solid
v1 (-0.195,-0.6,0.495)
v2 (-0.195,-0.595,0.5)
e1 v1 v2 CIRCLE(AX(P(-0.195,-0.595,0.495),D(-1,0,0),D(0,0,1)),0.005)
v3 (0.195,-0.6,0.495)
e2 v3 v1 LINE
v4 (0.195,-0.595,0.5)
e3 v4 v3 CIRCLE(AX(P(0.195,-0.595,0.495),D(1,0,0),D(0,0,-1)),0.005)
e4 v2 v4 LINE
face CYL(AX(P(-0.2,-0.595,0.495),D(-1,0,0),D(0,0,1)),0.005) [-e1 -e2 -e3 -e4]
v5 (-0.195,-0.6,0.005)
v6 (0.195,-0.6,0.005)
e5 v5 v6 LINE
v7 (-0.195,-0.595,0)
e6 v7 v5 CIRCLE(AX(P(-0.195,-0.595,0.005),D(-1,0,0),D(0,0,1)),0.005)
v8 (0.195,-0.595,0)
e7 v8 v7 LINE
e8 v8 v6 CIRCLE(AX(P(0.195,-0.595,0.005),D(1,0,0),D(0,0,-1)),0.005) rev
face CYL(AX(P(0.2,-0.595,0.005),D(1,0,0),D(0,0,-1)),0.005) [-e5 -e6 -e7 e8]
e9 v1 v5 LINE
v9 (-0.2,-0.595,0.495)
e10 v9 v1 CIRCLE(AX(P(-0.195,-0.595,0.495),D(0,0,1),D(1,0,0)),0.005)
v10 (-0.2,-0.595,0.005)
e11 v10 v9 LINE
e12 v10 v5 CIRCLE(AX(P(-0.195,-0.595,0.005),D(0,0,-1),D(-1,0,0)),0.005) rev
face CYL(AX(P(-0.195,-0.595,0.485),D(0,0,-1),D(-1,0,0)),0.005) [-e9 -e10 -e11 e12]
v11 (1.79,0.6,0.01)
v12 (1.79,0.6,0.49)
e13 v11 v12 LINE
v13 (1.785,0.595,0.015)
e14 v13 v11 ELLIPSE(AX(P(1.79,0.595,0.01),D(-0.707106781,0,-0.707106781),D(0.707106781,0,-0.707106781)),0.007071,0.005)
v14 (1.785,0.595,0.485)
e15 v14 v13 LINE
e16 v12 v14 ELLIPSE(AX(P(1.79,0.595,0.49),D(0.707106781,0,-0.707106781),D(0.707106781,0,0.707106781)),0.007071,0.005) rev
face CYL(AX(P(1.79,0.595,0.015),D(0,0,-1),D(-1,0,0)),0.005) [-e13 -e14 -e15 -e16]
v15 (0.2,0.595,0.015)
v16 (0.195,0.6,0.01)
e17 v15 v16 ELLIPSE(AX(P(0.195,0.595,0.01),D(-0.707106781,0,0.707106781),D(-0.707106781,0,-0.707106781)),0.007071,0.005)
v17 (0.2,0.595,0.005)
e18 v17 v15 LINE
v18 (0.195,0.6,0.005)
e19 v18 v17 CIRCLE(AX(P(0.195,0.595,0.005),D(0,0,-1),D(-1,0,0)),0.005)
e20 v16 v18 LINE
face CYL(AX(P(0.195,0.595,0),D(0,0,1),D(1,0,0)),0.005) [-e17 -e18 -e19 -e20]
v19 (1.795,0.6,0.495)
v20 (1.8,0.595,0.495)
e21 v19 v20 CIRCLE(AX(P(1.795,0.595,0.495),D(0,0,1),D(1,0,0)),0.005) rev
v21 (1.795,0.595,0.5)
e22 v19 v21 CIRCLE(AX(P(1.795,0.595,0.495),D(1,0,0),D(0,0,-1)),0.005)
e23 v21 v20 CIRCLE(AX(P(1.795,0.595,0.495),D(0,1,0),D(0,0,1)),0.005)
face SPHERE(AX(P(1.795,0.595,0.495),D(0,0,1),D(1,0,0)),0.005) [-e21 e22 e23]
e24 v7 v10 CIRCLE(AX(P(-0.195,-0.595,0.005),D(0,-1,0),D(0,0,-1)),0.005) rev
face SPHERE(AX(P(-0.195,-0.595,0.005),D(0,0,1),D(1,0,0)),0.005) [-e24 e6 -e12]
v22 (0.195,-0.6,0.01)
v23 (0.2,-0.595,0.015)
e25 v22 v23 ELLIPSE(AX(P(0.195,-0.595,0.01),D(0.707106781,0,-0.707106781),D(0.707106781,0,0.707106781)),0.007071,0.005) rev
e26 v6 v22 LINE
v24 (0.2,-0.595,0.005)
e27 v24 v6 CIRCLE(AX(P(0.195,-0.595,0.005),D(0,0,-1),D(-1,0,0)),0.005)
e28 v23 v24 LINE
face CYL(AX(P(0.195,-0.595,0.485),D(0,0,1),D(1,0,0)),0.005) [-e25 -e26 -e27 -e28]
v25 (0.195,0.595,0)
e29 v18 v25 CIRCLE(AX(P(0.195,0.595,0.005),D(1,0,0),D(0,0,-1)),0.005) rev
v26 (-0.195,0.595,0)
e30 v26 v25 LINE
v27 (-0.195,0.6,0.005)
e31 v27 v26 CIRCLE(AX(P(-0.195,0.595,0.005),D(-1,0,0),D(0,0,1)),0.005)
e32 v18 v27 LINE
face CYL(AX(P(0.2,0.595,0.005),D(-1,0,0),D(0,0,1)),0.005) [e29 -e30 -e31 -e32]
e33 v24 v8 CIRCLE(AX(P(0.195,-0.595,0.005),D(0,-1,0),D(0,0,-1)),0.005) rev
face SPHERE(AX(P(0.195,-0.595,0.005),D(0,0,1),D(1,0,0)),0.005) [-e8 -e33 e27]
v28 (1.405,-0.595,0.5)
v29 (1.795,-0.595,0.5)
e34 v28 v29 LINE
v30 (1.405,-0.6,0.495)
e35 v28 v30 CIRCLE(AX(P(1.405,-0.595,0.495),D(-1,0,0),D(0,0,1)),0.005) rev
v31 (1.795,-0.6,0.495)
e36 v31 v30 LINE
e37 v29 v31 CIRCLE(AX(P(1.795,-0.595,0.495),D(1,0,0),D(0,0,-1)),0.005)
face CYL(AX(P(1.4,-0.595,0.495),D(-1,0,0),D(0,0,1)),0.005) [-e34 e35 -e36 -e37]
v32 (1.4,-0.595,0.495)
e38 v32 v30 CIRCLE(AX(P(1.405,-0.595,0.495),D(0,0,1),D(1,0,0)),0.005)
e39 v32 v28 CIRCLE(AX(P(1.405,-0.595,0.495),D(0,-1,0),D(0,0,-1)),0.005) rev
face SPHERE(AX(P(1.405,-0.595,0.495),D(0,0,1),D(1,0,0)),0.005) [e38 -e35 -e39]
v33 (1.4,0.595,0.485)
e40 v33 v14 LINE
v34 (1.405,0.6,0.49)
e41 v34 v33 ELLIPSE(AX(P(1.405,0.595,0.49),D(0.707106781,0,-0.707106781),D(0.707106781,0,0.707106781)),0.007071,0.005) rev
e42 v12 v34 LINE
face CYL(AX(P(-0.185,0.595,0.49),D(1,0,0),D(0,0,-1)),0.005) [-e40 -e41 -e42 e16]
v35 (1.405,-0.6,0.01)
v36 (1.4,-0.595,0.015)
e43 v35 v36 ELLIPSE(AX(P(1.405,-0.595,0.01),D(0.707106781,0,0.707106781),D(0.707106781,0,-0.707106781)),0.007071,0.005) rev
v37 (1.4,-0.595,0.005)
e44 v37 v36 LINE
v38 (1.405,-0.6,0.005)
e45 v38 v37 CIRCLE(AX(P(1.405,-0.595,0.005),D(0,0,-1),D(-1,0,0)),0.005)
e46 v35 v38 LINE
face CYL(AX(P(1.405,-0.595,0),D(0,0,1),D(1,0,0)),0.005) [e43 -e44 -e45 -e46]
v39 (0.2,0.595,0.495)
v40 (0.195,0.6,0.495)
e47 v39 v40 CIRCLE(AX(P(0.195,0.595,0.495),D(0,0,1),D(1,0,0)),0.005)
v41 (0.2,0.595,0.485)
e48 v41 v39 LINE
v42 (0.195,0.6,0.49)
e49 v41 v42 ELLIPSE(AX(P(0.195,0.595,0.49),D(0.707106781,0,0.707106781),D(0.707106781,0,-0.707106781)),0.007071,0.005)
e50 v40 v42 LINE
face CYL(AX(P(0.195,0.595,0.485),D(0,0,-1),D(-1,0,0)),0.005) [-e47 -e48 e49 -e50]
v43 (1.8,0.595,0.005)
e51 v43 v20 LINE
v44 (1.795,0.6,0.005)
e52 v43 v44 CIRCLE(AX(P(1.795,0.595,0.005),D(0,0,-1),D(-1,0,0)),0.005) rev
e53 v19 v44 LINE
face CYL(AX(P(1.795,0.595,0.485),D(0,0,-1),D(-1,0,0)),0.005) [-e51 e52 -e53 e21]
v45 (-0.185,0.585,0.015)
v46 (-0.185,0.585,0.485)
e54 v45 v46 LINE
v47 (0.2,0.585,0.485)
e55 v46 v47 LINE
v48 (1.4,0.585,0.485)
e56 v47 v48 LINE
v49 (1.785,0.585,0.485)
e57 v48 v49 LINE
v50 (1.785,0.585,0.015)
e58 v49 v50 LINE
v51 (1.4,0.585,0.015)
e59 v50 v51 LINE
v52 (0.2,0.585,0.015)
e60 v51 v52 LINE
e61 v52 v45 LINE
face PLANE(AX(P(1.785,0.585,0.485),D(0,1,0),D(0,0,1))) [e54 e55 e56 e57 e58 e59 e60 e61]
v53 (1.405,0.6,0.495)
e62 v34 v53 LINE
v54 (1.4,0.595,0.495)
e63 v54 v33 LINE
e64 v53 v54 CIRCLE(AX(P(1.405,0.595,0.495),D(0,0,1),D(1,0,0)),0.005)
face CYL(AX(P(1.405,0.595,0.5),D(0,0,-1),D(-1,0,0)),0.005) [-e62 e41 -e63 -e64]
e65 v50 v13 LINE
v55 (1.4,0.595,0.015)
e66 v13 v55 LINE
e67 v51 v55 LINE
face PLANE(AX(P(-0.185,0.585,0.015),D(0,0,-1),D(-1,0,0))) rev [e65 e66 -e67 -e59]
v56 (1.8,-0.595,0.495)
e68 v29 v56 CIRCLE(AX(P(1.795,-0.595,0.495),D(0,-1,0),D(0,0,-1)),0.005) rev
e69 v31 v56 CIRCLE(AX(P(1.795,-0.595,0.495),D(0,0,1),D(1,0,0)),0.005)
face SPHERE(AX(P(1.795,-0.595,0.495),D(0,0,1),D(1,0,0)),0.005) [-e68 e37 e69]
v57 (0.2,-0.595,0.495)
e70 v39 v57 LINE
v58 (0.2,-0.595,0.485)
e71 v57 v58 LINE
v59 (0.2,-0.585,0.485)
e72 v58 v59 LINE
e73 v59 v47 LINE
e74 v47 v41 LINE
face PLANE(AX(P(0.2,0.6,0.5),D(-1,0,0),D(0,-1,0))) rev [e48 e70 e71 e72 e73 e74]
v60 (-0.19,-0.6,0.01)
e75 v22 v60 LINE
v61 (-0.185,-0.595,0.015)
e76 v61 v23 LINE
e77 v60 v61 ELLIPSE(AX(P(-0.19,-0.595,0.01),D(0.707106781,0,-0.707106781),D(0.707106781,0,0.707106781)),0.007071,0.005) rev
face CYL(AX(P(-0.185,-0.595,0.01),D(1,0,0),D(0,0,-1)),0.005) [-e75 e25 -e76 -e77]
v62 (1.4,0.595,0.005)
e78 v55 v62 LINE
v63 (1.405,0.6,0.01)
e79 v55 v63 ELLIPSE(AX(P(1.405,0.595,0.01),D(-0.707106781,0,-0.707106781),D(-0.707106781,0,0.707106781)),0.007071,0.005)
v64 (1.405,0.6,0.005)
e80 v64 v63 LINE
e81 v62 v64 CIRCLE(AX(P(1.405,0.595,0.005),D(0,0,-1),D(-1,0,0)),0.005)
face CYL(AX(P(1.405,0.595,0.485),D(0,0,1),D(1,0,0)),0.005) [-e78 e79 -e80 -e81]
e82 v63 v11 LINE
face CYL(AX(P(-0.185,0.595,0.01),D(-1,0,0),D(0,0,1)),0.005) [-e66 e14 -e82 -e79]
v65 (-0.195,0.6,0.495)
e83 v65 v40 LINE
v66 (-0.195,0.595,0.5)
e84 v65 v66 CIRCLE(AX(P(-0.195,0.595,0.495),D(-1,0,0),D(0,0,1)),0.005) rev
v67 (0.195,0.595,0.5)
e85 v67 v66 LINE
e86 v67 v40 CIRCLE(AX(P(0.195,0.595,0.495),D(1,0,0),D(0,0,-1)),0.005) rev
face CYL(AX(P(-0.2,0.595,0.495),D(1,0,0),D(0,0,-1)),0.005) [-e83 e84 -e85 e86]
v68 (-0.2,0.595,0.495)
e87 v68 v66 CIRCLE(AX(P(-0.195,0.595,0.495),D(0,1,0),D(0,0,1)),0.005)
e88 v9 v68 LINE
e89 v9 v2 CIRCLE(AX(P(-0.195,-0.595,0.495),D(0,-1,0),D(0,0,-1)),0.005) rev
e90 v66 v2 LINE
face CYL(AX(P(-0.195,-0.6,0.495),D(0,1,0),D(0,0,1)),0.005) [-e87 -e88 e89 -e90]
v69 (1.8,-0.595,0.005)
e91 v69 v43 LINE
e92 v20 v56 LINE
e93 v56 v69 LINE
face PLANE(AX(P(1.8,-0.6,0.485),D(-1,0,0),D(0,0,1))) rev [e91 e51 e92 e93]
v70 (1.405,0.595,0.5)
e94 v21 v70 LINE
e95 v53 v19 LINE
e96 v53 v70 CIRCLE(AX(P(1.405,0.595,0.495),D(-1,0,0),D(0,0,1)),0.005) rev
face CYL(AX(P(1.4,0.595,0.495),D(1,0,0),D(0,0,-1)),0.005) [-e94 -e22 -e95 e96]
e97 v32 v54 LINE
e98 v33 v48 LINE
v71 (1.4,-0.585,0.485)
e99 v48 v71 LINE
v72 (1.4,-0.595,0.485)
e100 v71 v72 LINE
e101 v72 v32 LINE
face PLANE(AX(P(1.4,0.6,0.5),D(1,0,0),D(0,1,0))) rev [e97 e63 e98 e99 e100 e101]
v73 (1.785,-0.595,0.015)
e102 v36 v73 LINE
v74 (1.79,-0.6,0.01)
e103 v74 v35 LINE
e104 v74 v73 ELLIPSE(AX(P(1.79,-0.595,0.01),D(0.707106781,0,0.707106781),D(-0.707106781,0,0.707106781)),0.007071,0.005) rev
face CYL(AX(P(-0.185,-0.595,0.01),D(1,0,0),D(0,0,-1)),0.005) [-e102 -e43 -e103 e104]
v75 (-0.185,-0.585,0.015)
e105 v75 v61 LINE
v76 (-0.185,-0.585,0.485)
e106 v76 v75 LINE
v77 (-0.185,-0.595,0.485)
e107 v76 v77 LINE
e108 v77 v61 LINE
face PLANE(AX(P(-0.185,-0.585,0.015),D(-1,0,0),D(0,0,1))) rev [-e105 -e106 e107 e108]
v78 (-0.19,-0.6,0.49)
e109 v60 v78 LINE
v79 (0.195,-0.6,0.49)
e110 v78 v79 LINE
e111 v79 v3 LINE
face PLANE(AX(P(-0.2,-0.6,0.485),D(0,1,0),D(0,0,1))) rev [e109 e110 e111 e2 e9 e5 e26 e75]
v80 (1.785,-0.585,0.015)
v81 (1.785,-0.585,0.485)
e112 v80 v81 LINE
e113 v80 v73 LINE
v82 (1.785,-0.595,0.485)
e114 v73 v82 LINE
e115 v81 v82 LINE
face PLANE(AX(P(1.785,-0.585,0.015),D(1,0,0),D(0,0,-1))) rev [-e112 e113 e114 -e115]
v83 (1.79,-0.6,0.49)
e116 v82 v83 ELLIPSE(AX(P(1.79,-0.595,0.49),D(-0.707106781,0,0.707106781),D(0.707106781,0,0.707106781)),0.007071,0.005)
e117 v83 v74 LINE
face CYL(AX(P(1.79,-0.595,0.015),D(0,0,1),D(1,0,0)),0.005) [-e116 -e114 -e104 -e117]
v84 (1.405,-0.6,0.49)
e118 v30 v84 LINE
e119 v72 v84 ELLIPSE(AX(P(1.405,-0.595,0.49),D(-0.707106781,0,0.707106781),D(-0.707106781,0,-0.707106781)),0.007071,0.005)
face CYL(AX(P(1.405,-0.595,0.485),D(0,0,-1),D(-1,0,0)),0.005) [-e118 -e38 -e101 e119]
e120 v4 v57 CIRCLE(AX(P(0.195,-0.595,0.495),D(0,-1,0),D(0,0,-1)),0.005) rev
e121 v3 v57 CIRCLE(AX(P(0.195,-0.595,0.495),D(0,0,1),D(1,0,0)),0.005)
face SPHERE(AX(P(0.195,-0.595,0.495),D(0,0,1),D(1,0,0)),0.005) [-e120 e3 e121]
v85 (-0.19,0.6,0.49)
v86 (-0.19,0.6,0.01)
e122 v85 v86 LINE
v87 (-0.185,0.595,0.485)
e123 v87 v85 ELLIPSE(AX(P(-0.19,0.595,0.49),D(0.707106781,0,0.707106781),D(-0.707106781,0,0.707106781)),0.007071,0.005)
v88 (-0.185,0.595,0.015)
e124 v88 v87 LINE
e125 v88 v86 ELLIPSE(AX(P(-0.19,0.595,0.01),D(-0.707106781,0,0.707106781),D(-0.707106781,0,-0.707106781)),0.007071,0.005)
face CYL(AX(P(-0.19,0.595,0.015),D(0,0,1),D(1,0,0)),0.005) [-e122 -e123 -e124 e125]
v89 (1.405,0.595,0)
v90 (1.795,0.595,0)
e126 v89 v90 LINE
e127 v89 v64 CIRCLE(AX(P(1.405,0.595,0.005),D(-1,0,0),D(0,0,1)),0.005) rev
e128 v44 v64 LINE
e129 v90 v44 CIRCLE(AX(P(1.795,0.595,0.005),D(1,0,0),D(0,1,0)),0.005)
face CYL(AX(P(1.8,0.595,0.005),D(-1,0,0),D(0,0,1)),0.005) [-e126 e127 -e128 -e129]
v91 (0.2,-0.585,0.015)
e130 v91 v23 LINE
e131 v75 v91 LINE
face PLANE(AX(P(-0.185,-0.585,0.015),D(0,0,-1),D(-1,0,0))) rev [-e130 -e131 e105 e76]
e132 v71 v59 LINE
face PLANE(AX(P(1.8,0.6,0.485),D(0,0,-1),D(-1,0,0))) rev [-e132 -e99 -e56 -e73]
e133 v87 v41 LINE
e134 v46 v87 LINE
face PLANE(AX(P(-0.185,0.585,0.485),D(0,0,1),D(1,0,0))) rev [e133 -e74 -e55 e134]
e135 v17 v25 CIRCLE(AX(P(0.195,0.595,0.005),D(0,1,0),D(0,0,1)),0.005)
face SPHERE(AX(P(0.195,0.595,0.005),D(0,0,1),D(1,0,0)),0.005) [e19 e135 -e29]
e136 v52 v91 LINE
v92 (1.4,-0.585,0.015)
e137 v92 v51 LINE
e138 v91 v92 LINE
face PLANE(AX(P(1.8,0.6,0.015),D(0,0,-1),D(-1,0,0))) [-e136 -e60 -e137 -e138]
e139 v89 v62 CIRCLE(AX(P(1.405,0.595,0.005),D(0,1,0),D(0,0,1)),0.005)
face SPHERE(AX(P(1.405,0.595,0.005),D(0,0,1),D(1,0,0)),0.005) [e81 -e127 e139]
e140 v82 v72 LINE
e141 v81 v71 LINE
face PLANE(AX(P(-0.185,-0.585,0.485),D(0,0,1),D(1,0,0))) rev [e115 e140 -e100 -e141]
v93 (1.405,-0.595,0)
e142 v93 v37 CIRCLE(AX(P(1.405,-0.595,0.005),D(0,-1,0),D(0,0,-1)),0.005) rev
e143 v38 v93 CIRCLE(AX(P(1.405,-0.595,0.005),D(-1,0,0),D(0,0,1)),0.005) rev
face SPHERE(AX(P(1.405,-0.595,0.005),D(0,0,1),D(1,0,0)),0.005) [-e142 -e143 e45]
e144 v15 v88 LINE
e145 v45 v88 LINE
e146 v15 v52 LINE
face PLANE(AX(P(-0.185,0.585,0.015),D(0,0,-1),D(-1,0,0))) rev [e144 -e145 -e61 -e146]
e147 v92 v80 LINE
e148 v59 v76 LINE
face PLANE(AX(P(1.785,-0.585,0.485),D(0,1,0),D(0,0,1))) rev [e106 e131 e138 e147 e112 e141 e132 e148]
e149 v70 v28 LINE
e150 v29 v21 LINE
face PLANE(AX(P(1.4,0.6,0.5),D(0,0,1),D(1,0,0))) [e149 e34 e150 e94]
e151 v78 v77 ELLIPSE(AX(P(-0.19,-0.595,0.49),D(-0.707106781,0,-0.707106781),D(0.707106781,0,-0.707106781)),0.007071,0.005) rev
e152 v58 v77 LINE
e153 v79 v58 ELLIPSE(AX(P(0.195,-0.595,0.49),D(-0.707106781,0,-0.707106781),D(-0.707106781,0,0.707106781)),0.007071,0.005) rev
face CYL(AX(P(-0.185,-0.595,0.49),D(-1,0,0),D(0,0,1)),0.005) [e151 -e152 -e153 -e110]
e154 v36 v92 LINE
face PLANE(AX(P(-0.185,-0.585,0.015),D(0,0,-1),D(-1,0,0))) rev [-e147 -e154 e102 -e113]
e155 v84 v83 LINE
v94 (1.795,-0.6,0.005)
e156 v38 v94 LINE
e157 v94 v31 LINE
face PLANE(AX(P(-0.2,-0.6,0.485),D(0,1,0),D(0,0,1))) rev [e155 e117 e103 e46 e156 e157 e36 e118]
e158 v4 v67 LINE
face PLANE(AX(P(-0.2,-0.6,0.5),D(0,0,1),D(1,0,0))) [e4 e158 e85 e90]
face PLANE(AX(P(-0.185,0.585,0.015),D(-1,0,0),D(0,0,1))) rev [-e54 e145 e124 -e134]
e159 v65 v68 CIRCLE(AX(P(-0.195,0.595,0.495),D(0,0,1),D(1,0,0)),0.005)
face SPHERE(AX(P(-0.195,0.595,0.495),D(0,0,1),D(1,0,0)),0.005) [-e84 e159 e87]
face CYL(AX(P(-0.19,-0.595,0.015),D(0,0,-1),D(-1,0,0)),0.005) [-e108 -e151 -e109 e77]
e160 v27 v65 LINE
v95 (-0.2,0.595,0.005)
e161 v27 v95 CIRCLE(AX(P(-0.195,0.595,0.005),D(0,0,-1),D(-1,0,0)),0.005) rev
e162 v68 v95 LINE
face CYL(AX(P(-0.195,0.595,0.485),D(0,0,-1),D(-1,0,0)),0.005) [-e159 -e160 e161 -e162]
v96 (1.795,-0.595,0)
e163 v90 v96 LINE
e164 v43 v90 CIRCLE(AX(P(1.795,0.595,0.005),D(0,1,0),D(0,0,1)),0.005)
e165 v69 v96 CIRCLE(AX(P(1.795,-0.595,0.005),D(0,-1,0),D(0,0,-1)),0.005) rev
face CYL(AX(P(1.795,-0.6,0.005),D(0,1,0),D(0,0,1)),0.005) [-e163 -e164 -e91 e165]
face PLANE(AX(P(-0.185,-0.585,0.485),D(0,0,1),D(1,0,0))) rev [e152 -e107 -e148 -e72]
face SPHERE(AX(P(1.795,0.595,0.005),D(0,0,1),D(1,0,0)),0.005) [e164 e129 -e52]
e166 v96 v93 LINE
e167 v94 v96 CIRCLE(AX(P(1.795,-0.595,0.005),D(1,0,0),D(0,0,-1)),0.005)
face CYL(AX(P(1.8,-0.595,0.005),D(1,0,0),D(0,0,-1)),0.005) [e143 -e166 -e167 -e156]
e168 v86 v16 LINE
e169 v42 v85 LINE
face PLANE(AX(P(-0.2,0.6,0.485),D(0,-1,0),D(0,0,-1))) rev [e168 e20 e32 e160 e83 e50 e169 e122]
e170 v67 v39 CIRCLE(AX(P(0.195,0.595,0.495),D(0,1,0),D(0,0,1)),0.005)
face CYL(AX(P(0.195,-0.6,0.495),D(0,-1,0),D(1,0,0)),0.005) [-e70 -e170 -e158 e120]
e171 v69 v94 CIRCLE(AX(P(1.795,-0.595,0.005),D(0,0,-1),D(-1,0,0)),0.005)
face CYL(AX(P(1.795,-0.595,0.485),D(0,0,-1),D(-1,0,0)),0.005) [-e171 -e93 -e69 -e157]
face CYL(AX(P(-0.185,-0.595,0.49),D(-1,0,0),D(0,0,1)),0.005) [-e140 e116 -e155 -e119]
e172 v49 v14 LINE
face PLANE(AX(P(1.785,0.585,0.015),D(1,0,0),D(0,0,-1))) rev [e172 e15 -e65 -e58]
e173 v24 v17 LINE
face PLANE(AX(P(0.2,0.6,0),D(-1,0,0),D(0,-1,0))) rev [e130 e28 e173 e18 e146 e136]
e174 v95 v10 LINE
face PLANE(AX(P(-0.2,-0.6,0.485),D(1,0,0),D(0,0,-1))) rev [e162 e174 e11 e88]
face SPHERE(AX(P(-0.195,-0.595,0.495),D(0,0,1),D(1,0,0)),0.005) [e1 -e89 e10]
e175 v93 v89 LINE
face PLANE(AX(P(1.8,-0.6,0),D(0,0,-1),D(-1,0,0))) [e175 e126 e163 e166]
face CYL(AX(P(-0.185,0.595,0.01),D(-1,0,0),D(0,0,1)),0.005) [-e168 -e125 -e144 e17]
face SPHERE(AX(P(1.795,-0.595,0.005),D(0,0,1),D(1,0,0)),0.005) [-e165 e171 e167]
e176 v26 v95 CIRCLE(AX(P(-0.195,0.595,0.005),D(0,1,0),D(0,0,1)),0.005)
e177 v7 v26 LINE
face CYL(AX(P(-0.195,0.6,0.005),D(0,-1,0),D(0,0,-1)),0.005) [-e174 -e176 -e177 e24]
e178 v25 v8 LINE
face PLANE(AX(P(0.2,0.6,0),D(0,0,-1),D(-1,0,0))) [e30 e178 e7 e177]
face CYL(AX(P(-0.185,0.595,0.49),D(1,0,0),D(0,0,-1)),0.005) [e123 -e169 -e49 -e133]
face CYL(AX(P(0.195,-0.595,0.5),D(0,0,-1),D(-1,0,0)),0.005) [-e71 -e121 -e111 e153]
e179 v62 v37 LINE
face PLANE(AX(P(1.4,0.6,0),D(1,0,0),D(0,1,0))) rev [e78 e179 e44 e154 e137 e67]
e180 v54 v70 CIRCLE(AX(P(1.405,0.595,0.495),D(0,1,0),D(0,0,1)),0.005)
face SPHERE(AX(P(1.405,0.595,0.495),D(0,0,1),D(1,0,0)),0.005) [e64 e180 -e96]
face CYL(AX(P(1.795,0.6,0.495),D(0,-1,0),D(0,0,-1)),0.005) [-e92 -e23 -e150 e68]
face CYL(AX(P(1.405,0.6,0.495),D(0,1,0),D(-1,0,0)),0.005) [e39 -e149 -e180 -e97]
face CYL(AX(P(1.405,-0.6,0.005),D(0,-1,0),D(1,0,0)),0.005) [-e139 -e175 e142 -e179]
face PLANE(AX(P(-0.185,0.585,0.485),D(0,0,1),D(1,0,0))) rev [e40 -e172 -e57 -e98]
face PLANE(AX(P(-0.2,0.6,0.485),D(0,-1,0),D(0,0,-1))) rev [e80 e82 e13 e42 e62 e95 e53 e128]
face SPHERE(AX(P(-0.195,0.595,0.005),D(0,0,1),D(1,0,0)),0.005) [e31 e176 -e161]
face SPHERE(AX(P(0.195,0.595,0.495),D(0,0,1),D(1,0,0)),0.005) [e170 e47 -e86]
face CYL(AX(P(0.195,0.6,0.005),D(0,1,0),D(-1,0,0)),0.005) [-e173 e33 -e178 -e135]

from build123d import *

# Parameters (mm, degrees)
SKETCH_1_W          = 2
SKETCH_1_H          = 1.2
EXTRUDE_1_DEPTH     = 0.47
SKETCH_2_W          = 0.4
SKETCH_2_H          = 1.2
EXTRUDE_2_DEPTH     = 0.015
SKETCH_3_W          = 0.4
SKETCH_3_H          = 1.2
EXTRUDE_3_DEPTH     = 0.015
SKETCH_4_W          = 1.97
SKETCH_4_H          = 0.47
CUT_EXTRUDE_1_DEPTH = 0.015
SKETCH_5_W          = 1.97
SKETCH_5_H          = 0.47
CUT_EXTRUDE_2_DEPTH = 0.015
FILLET_1_R          = 0.005


with BuildPart() as part:
    # Эскиз1 → Бобышка-Вытянуть1 (new body)
    with BuildSketch(Plane.XY):
        Rectangle(SKETCH_1_W, SKETCH_1_H)
    extrude(amount=EXTRUDE_1_DEPTH)

    # Эскиз2 → Бобышка-Вытянуть2 (add)
    with BuildSketch(Plane.XY.offset(0.47)):
        with Locations((-0.8, 0)):
            Rectangle(SKETCH_2_W, SKETCH_2_H)
        with Locations((0.8, 0)):
            Rectangle(SKETCH_2_W, SKETCH_2_H)
    extrude(amount=EXTRUDE_2_DEPTH)

    # Эскиз3 → Бобышка-Вытянуть3 (add)
    with BuildSketch(Plane(origin=(0, 0, 0), x_dir=(-1, 0, 0), z_dir=(0, 0, -1))):
        with Locations((-0.8, 0)):
            Rectangle(SKETCH_3_W, SKETCH_3_H)
        with Locations((0.8, 0)):
            Rectangle(SKETCH_3_W, SKETCH_3_H)
    extrude(amount=EXTRUDE_3_DEPTH)

    # Эскиз4 → Вырез-Вытянуть1 (cut)
    with BuildSketch(Plane.XZ.offset(0.6)):
        with Locations((0, 0.235)):
            Rectangle(SKETCH_4_W, SKETCH_4_H)
    extrude(amount=-CUT_EXTRUDE_1_DEPTH, mode=Mode.SUBTRACT)

    # Эскиз5 → Вырез-Вытянуть2 (cut)
    with BuildSketch(Plane(origin=(0, 0.6, 0), x_dir=(1, 0, 0), z_dir=(0, 1, 0))):
        with Locations((0, -0.235)):
            Rectangle(SKETCH_5_W, SKETCH_5_H)
    extrude(amount=-CUT_EXTRUDE_2_DEPTH, mode=Mode.SUBTRACT)

    # Скругление1
    fillet_1_edges = [part.edges().sort_by_distance(p)[0] for p in [
        (0.985, 0.6, 0.235),
        (0.7925, 0.6, 0),
        (-0.7925, 0.6, 0),
        (-0.985, 0.6, 0.235),
        (-0.7925, 0.6, 0.47),
        (0.7925, 0.6, 0.47),
        (-0.6, -0.6, 0.4775),
        (-0.6, 0.6, 0.4775),
        (-1, 0, 0.485),
        (-0.8, -0.6, 0.485),
        (-0.6, 0, 0.485),
        (-0.8, 0.6, 0.485),
        (0.6, 0.6, 0.4775),
        (0.6, -0.6, 0.4775),
        (0.8, 0.6, 0.485),
        (0.6, 0, 0.485),
        (0.8, -0.6, 0.485),
        (1, 0, 0.485),
        (0.6, -0.6, -0.0075),
        (0.6, 0.6, -0.0075),
        (1, 0, -0.015),
        (0.8, -0.6, -0.015),
        (0.6, 0, -0.015),
        (0.8, 0.6, -0.015),
        (-0.6, 0.6, -0.0075),
        (-0.6, -0.6, -0.0075),
        (-0.8, 0.6, -0.015),
        (-0.6, 0, -0.015),
        (-0.8, -0.6, -0.015),
        (-1, 0, -0.015),
        (1, -0.6, 0.235),
        (-1, -0.6, 0.235),
        (0.985, -0.6, 0.235),
        (0.7925, -0.6, 0.47),
        (-1, 0.6, 0.235),
        (-0.7925, -0.6, 0.47),
        (-0.985, -0.6, 0.235),
        (-0.7925, -0.6, 0),
        (1, 0.6, 0.235),
        (0.7925, -0.6, 0),
    ]]
    fillet(fillet_1_edges, radius=FILLET_1_R)


with BuildPart() as part_1:
    # Move Body 2: read off the stored shape, not the designer's step
    # Move Body 2: moved
    add(part.part.moved(Location((0.8, 0, 0.015))))


solid = part_1.part
